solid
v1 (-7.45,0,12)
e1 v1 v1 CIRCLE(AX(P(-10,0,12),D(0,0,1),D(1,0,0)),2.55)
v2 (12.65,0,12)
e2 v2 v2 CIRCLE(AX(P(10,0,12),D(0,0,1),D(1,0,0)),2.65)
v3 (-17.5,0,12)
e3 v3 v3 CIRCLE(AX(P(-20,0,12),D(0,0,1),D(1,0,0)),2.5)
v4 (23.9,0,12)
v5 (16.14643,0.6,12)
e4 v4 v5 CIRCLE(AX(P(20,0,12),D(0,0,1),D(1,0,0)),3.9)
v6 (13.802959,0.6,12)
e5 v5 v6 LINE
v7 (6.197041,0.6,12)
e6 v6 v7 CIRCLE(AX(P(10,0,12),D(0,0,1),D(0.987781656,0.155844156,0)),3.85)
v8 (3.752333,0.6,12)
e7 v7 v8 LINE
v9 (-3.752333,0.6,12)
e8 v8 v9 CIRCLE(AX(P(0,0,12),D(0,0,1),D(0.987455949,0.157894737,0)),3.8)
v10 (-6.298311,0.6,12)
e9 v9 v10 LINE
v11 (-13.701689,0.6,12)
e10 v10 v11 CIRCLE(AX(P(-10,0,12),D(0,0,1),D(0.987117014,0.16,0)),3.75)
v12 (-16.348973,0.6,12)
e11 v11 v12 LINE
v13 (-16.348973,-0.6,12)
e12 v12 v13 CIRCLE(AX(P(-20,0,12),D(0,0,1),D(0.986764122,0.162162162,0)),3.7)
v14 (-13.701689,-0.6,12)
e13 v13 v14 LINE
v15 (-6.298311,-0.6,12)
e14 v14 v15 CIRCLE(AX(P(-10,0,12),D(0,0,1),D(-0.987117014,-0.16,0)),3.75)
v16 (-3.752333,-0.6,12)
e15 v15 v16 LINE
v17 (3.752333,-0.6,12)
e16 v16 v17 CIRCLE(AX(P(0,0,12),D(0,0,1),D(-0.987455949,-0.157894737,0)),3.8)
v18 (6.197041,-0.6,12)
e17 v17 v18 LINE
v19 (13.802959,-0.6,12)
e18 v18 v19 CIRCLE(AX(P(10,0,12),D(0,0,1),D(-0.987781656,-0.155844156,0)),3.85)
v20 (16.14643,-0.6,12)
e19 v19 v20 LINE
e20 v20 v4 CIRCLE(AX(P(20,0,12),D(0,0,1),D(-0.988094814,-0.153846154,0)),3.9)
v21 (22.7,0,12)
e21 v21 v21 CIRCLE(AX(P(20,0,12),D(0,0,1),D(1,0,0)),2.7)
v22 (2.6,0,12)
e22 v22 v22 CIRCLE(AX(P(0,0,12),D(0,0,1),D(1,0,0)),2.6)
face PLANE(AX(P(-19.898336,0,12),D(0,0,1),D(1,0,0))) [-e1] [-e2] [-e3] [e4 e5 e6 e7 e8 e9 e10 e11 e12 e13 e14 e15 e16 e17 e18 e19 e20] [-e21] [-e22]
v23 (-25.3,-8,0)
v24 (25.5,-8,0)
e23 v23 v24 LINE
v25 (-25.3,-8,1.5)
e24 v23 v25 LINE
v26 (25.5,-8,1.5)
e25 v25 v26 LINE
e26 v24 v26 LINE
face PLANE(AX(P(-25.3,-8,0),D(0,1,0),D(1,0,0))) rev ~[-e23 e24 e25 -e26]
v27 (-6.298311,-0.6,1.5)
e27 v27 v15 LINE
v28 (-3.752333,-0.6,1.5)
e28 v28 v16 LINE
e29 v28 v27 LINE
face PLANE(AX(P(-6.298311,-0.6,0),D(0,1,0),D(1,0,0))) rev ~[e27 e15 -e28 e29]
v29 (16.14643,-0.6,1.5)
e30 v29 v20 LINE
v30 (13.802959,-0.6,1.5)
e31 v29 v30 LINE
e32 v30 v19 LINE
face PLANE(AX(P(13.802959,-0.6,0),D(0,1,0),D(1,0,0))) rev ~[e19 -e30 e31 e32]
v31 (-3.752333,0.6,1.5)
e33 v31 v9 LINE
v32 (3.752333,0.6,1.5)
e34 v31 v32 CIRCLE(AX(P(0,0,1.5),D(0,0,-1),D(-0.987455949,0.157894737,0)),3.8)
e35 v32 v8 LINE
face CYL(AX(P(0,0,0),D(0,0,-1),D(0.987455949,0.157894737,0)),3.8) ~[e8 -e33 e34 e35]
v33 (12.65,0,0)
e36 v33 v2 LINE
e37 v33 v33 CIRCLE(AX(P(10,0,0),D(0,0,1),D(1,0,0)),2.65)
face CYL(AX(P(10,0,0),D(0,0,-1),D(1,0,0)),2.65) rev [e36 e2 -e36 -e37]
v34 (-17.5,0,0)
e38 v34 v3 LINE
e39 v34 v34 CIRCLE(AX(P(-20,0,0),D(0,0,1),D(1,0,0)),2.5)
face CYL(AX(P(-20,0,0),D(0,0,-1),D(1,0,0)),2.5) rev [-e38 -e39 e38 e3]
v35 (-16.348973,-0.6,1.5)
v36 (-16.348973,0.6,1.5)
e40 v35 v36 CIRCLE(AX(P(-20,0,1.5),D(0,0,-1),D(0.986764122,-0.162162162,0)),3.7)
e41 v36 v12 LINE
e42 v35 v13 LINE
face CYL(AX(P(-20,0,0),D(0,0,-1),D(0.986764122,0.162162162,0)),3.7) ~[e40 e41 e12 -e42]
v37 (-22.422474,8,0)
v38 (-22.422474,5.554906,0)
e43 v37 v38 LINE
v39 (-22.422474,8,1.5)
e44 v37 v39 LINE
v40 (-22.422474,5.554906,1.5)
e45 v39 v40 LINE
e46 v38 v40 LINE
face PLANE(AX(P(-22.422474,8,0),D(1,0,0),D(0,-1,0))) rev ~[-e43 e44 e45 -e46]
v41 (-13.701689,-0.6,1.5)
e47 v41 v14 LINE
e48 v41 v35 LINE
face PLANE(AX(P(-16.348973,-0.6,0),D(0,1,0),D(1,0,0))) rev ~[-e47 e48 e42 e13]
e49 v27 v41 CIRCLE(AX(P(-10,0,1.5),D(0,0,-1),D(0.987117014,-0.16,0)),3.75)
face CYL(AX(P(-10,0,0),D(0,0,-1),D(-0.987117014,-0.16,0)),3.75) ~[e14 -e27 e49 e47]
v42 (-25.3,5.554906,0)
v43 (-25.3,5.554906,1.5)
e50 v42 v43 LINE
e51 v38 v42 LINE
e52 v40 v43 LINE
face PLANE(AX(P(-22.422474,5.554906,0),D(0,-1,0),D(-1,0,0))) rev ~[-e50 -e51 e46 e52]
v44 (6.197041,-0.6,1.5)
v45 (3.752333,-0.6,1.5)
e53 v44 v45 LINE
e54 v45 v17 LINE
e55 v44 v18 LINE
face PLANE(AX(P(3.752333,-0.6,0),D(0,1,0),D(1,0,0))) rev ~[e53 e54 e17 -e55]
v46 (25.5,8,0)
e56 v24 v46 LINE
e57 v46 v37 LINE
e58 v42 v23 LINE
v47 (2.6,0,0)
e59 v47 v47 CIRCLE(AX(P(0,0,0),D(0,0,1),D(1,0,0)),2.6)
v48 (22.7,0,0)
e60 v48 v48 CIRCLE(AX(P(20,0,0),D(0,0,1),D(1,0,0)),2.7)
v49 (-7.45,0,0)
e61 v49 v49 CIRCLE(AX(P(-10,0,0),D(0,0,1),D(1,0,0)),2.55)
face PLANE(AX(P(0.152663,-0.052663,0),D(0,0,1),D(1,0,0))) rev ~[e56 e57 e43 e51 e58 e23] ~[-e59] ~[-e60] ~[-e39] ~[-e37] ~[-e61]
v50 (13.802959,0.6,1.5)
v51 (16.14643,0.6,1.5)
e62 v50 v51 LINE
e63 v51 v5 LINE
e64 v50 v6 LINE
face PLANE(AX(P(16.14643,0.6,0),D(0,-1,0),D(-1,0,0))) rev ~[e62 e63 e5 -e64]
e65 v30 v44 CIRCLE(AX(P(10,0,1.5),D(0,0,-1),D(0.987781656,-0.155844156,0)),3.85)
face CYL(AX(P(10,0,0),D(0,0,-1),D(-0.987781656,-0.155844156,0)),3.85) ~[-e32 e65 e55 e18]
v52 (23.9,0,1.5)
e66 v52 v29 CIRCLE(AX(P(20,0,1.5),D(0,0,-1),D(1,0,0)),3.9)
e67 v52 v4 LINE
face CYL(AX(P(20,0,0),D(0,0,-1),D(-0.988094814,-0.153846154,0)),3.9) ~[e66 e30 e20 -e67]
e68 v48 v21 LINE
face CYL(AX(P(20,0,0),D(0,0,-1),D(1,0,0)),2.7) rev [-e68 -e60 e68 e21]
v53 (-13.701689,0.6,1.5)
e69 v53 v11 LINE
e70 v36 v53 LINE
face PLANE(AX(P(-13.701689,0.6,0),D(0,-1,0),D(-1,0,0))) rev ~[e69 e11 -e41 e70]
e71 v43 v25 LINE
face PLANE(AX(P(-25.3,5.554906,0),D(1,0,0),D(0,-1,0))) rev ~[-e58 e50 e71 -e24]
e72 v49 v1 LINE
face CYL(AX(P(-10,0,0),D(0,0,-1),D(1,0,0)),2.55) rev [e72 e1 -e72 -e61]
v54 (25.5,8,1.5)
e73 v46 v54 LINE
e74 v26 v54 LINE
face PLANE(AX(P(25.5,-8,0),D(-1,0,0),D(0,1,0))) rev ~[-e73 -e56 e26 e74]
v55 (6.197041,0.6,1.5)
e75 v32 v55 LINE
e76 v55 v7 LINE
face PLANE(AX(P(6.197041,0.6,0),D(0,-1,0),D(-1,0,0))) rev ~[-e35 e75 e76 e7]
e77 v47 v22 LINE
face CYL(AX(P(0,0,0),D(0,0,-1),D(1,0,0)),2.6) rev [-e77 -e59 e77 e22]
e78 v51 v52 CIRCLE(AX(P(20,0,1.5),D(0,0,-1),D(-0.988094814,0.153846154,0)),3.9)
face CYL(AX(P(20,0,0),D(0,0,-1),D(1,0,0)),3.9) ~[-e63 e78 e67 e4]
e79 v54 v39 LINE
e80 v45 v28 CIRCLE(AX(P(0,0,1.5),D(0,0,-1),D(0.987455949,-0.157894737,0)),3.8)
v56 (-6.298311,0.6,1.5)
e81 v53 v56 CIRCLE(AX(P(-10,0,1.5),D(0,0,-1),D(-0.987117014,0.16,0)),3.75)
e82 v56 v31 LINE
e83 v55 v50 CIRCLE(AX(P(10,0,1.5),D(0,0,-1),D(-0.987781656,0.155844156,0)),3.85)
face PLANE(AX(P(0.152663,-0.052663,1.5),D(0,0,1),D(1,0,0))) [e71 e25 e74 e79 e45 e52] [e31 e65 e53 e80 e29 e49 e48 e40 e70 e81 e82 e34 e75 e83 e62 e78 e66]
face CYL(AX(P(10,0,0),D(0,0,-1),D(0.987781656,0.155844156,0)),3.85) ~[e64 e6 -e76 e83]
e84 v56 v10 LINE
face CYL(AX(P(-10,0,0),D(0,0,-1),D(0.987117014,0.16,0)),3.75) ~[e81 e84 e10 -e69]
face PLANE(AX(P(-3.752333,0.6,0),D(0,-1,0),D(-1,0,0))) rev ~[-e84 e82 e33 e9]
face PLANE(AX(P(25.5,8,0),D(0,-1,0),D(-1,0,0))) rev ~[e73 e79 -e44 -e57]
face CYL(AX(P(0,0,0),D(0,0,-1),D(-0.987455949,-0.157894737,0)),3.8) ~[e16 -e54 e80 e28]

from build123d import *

# Parameters (mm, degrees)
F1_DEPTH = 1.5
F0_R     = 2.5
F0_R_2   = 2.55
F0_R_3   = 2.6
F0_R_4   = 2.65
F0_R_5   = 2.7
F2_DEPTH = 12


# Not quite as in the source:
# - a feature names something its author has since deleted; it is built from what else it names


with BuildPart() as f1:
    # F0 (on Top) → F1 (new body)
    with BuildSketch(Plane.XY):
        Polygon((-25.3, 5.5549060926), (-25.3, -8), (25.5, -8), (25.5, 8), (-22.4224738777, 8), (-22.4224738777, 5.5549060926), align=None)
        with BuildLine():
            ThreePointArc((-16.3489727473, -0.6), (-23.7, 0), (-16.3489727473, 0.6))
            Line((-16.3489727473, 0.6), (-13.7016888038, 0.6))
            ThreePointArc((-13.7016888038, 0.6), (-10, 3.75), (-6.2983111962, 0.6))
            Line((-6.2983111962, 0.6), (-3.7523326079, 0.6))
            ThreePointArc((-3.7523326079, 0.6), (0, 3.8), (3.7523326079, 0.6))
            Line((3.7523326079, 0.6), (6.197040626, 0.6))
            ThreePointArc((6.197040626, 0.6), (10, 3.85), (13.802959374, 0.6))
            Line((13.802959374, 0.6), (16.1464302264, 0.6))
            ThreePointArc((16.1464302264, 0.6), (20.3008968951, 3.888375118), (23.9, 0))
            ThreePointArc((23.9, 0), (20.3008968951, -3.888375118), (16.1464302264, -0.6))
            Line((16.1464302264, -0.6), (13.802959374, -0.6))
            ThreePointArc((13.802959374, -0.6), (10, -3.85), (6.197040626, -0.6))
            Line((6.197040626, -0.6), (3.7523326079, -0.6))
            ThreePointArc((3.7523326079, -0.6), (0, -3.8), (-3.7523326079, -0.6))
            Line((-3.7523326079, -0.6), (-6.2983111962, -0.6))
            ThreePointArc((-6.2983111962, -0.6), (-10, -3.75), (-13.7016888038, -0.6))
            Line((-13.7016888038, -0.6), (-16.3489727473, -0.6))
        make_face(mode=Mode.SUBTRACT)
    extrude(amount=F1_DEPTH)

    # F0 (on Top) → F2 (join)
    with BuildSketch(Plane.XY):
        with BuildLine():
            ThreePointArc((-16.3489727473, -0.6), (-16.3122635103, -0.3009976453), (-16.3, 0))
            ThreePointArc((-16.3, 0), (-16.3122635103, 0.3009976453), (-16.3489727473, 0.6))
            ThreePointArc((-16.3489727473, 0.6), (-23.7, 0), (-16.3489727473, -0.6))
        make_face()
        with Locations((-20, 0)):
            Circle(F0_R, mode=Mode.SUBTRACT)
        with BuildLine():
            ThreePointArc((-16.3489727473, 0.6), (-16.3122635103, 0.3009976453), (-16.3, 0))
            ThreePointArc((-16.3, 0), (-16.3122635103, -0.3009976453), (-16.3489727473, -0.6))
            Line((-16.3489727473, -0.6), (-13.7016888038, -0.6))
            ThreePointArc((-13.7016888038, -0.6), (-13.75, 0), (-13.7016888038, 0.6))
            Line((-13.7016888038, 0.6), (-16.3489727473, 0.6))
        make_face()
        with BuildLine():
            ThreePointArc((-6.2983111962, 0.6), (-10, 3.75), (-13.7016888038, 0.6))
            ThreePointArc((-13.7016888038, 0.6), (-13.75, 0), (-13.7016888038, -0.6))
            ThreePointArc((-13.7016888038, -0.6), (-10, -3.75), (-6.2983111962, -0.6))
            ThreePointArc((-6.2983111962, -0.6), (-6.2620973117, -0.3009709171), (-6.25, 0))
            ThreePointArc((-6.25, 0), (-6.2620973117, 0.3009709171), (-6.2983111962, 0.6))
        make_face()
        with Locations((-10, 0)):
            Circle(F0_R_2, mode=Mode.SUBTRACT)
        with BuildLine():
            Line((-3.7523326079, 0.6), (-6.2983111962, 0.6))
            ThreePointArc((-6.2983111962, 0.6), (-6.2620973117, 0.3009709171), (-6.25, 0))
            ThreePointArc((-6.25, 0), (-6.2620973117, -0.3009709171), (-6.2983111962, -0.6))
            Line((-6.2983111962, -0.6), (-3.7523326079, -0.6))
            ThreePointArc((-3.7523326079, -0.6), (-3.8, 0), (-3.7523326079, 0.6))
        make_face()
        with BuildLine():
            ThreePointArc((3.7523326079, 0.6), (0, 3.8), (-3.7523326079, 0.6))
            ThreePointArc((-3.7523326079, 0.6), (-3.8, 0), (-3.7523326079, -0.6))
            ThreePointArc((-3.7523326079, -0.6), (0, -3.8), (3.7523326079, -0.6))
            ThreePointArc((3.7523326079, -0.6), (3.7880644074, -0.3009452526), (3.8, 0))
            ThreePointArc((3.8, 0), (3.7880644074, 0.3009452526), (3.7523326079, 0.6))
        make_face()
        Circle(F0_R_3, mode=Mode.SUBTRACT)
        with BuildLine():
            Line((6.197040626, 0.6), (3.7523326079, 0.6))
            ThreePointArc((3.7523326079, 0.6), (3.7880644074, 0.3009452526), (3.8, 0))
            ThreePointArc((3.8, 0), (3.7880644074, -0.3009452526), (3.7523326079, -0.6))
            Line((3.7523326079, -0.6), (6.197040626, -0.6))
            ThreePointArc((6.197040626, -0.6), (6.15, 0), (6.197040626, 0.6))
        make_face()
        with BuildLine():
            ThreePointArc((13.802959374, 0.6), (10, 3.85), (6.197040626, 0.6))
            ThreePointArc((6.197040626, 0.6), (6.15, 0), (6.197040626, -0.6))
            ThreePointArc((6.197040626, -0.6), (10, -3.85), (13.802959374, -0.6))
            ThreePointArc((13.802959374, -0.6), (13.8382218272, -0.300920596), (13.85, 0))
            ThreePointArc((13.85, 0), (13.8382218272, 0.300920596), (13.802959374, 0.6))
        make_face()
        with Locations((10, 0)):
            Circle(F0_R_4, mode=Mode.SUBTRACT)
        with BuildLine():
            Line((16.1464302264, 0.6), (13.802959374, 0.6))
            ThreePointArc((13.802959374, 0.6), (13.8382218272, 0.300920596), (13.85, 0))
            ThreePointArc((13.85, 0), (13.8382218272, -0.300920596), (13.802959374, -0.6))
            Line((13.802959374, -0.6), (16.1464302264, -0.6))
            ThreePointArc((16.1464302264, -0.6), (16.1, 0), (16.1464302264, 0.6))
        make_face()
        with BuildLine():
            ThreePointArc((23.9, 0), (20.3008968951, 3.888375118), (16.1464302264, 0.6))
            ThreePointArc((16.1464302264, 0.6), (16.1, 0), (16.1464302264, -0.6))
            ThreePointArc((16.1464302264, -0.6), (20.3008968951, -3.888375118), (23.9, 0))
        make_face()
        with Locations((20, 0)):
            Circle(F0_R_5, mode=Mode.SUBTRACT)
    extrude(amount=F2_DEPTH)


solid = f1.part
